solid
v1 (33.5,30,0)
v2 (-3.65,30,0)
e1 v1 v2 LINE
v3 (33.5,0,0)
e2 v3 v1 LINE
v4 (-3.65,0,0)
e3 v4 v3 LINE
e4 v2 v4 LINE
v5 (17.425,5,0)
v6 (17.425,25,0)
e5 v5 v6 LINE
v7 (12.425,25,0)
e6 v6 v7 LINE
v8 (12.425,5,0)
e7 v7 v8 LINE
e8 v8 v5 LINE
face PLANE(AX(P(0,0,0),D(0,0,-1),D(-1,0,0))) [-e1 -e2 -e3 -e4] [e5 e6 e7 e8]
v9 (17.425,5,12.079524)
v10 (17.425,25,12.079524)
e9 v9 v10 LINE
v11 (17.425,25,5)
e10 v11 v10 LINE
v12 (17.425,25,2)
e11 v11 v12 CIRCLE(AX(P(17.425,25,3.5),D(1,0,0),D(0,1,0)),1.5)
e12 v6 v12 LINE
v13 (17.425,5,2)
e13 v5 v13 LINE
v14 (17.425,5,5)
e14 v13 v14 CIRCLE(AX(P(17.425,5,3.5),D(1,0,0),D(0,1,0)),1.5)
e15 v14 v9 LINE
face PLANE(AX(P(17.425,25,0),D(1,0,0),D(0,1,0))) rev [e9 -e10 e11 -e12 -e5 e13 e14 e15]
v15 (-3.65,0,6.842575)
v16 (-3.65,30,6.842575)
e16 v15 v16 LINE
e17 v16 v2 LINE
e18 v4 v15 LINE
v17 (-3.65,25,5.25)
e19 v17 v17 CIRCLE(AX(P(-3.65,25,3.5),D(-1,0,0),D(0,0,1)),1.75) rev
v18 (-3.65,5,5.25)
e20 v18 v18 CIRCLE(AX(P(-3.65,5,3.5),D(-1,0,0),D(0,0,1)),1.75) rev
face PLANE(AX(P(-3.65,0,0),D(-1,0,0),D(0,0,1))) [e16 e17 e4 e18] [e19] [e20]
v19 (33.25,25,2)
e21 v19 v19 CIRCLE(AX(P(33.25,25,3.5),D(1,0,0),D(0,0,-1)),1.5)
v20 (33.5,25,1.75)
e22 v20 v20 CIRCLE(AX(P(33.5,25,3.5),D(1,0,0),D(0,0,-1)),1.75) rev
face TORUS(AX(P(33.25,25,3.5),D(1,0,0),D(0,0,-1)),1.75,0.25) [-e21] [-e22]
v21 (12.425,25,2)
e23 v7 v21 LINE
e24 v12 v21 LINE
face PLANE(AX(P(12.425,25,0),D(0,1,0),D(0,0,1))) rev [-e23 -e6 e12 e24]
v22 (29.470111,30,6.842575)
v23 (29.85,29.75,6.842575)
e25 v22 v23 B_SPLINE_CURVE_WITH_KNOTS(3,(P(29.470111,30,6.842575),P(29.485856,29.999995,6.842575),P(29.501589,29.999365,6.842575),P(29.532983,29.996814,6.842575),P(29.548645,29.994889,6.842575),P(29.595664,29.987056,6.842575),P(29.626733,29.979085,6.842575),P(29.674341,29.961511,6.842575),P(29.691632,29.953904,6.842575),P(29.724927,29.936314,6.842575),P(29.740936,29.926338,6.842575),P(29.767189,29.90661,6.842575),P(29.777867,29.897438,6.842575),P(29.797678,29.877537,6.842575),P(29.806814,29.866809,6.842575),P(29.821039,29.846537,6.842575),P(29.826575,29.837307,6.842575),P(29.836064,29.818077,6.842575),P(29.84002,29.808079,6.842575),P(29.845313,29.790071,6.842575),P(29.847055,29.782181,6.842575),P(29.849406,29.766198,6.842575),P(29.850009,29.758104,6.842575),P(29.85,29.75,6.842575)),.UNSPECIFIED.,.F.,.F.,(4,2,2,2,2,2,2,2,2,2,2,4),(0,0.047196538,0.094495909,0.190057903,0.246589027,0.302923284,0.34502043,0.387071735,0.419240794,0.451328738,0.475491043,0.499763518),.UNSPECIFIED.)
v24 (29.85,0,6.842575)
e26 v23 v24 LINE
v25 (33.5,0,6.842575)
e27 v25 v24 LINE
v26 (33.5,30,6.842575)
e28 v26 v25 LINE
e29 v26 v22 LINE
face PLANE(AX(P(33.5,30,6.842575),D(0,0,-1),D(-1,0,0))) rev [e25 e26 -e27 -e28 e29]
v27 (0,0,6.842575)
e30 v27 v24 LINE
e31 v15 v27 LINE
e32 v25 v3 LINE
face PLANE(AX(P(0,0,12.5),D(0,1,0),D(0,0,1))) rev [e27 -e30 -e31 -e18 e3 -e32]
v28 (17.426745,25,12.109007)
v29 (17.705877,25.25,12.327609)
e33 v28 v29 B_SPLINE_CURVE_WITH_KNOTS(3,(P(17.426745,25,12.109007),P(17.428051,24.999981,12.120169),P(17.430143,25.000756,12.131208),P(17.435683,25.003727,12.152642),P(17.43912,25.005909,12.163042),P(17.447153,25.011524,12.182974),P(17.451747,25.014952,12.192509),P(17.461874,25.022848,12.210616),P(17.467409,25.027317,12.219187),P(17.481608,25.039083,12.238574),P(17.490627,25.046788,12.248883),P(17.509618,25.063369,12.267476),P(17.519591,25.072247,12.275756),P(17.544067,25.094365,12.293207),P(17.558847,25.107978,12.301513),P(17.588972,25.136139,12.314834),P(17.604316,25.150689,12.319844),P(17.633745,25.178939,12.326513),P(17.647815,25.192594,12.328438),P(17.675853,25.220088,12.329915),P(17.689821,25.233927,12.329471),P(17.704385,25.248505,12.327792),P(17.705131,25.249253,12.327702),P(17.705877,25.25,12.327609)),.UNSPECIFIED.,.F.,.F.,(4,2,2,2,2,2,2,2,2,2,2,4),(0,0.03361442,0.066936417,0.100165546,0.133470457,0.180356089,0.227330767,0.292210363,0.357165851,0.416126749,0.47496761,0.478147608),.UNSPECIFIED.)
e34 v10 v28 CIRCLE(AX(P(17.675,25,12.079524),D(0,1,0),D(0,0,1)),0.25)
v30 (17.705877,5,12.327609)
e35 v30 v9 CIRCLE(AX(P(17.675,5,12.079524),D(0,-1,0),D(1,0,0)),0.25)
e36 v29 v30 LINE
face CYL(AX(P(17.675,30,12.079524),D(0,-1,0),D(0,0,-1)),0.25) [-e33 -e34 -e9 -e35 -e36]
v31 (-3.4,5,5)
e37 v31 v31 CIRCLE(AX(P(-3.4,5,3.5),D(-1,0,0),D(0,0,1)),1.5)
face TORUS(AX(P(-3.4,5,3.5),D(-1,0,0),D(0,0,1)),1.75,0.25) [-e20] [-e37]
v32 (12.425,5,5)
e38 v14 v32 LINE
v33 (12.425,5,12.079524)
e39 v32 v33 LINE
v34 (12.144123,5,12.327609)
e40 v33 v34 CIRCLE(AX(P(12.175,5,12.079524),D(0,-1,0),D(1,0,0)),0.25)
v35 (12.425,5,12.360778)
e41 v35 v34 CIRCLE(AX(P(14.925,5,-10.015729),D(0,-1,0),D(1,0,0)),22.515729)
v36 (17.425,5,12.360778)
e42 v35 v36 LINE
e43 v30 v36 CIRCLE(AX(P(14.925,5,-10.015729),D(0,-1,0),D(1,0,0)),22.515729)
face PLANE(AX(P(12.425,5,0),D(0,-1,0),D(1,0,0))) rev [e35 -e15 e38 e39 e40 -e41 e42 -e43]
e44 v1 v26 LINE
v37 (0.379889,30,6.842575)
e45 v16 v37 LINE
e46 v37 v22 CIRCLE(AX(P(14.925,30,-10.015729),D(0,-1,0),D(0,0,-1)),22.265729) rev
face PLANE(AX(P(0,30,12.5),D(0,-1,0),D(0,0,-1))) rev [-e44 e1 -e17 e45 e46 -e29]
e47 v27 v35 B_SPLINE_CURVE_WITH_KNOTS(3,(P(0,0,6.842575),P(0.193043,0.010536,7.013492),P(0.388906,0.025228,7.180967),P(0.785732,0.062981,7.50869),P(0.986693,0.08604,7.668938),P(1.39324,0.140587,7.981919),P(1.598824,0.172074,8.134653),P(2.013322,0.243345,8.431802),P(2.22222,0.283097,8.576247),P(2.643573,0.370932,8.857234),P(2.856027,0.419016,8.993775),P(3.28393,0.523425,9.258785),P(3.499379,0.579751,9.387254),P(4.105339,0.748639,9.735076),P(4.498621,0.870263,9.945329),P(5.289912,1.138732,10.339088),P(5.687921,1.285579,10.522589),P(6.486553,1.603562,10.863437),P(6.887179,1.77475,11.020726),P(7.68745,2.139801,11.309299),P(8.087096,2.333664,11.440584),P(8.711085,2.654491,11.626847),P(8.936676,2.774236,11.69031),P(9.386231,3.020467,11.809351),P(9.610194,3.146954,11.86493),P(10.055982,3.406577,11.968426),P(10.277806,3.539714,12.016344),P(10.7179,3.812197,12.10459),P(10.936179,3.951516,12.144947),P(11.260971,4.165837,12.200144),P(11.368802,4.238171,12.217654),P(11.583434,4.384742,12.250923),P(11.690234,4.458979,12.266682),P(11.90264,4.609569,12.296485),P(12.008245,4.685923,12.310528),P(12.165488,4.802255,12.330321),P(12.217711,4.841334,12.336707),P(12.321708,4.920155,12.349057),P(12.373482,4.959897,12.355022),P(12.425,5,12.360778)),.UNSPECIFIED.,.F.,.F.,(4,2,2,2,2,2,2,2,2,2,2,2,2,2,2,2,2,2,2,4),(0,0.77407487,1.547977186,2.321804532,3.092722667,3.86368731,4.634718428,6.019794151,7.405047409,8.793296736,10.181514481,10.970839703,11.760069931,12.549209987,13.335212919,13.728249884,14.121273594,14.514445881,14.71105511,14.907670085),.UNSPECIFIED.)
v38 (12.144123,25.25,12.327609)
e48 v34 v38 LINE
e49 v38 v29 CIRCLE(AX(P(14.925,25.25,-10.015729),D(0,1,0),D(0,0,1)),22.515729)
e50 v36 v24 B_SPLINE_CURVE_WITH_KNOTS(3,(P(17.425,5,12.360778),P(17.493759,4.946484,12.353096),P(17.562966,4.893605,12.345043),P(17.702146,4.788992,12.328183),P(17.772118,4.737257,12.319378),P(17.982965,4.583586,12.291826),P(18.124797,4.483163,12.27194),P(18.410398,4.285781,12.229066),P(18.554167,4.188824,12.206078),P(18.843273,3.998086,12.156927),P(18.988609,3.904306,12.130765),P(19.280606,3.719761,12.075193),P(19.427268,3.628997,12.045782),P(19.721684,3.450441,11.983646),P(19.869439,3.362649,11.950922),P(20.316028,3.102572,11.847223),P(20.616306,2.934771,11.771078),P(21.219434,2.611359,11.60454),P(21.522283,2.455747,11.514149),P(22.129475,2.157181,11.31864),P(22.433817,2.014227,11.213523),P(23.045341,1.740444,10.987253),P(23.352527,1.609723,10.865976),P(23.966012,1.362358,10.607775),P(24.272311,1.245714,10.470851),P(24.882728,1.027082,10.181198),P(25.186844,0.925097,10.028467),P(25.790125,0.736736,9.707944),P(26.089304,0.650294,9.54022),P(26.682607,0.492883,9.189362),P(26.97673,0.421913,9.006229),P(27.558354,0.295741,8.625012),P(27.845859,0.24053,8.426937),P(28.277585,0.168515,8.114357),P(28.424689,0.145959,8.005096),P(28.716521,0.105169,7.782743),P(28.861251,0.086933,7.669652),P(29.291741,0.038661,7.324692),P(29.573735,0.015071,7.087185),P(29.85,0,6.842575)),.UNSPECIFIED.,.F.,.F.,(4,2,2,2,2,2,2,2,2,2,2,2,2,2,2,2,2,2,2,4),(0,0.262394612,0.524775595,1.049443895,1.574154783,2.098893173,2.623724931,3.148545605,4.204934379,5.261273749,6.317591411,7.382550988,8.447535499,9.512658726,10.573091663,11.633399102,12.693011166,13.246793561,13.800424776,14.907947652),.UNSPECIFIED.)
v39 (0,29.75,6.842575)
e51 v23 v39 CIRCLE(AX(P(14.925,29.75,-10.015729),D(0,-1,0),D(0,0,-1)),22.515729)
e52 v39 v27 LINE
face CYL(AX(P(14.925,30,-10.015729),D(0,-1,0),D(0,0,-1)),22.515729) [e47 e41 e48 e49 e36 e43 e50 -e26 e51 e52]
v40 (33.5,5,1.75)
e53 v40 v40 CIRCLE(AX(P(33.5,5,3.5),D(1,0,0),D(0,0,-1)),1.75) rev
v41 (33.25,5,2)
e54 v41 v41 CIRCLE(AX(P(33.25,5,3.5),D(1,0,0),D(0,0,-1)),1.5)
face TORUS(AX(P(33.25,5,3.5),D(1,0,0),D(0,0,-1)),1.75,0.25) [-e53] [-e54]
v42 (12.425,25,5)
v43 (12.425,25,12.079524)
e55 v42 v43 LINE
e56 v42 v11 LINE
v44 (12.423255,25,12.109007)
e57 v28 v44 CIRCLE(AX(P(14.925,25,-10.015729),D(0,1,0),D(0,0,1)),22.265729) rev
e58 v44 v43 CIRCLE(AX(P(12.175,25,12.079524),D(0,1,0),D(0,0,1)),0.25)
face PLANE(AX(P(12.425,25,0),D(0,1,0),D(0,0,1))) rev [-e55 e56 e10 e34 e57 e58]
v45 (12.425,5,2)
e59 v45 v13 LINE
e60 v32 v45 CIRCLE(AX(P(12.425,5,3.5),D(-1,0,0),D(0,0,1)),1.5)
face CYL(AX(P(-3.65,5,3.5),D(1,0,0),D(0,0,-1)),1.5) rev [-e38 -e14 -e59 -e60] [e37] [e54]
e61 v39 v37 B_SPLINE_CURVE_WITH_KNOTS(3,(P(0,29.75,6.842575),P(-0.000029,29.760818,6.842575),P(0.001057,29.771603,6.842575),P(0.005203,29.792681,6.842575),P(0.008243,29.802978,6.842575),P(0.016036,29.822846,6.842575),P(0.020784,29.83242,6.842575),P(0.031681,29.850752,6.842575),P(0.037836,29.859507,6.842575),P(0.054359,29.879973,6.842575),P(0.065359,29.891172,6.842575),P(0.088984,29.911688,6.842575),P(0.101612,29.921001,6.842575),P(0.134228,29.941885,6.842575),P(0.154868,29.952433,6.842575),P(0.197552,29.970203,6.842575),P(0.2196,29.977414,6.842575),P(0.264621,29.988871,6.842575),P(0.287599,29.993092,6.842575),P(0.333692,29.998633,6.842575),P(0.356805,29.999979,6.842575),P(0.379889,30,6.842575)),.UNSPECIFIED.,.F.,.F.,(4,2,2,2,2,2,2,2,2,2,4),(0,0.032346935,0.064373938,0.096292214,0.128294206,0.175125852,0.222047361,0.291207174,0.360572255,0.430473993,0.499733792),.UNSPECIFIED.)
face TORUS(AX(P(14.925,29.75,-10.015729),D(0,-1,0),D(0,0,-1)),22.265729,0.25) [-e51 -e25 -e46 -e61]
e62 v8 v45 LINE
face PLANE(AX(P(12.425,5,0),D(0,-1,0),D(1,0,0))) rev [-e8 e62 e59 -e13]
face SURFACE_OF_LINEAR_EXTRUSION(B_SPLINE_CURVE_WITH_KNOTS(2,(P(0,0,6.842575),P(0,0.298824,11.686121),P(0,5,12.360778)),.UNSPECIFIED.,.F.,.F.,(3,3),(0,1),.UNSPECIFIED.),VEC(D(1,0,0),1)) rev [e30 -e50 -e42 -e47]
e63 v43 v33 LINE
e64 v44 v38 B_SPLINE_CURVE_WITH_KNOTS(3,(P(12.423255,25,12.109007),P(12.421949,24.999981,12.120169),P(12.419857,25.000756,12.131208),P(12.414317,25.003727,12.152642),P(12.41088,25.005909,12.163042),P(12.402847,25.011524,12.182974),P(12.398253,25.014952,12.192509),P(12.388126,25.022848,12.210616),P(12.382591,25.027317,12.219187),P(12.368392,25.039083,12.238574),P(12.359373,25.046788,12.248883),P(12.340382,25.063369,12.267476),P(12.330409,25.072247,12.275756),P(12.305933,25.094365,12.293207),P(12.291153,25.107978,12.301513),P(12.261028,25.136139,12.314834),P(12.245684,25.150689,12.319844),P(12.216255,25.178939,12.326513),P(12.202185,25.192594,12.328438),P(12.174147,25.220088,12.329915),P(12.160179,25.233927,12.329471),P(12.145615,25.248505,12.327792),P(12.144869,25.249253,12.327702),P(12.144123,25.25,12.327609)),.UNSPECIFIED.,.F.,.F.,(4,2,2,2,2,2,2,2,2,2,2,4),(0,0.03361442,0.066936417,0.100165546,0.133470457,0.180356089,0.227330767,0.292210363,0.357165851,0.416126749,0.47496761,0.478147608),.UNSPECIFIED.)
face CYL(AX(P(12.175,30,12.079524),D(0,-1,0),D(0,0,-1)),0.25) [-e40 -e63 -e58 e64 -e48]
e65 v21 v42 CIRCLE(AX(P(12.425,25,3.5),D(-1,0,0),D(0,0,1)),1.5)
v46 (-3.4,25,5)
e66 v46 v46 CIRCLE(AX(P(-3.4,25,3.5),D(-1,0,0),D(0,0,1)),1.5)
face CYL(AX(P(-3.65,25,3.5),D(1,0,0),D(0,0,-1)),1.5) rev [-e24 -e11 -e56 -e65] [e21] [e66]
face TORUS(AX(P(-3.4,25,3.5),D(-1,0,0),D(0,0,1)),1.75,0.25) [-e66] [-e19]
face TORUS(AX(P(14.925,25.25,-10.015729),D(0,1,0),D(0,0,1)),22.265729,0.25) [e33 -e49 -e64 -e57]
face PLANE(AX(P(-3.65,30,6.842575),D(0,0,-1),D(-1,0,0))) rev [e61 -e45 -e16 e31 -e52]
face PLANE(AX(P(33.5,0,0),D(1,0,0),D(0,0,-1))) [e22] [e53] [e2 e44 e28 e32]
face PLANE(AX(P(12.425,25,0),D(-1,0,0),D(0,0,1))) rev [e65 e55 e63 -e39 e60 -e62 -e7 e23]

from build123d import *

# Parameters (mm, degrees)
SKETCH1_W               = 29.85
SKETCH1_H               = 30
BOSS_EXTRUDE1_DEPTH     = 12.5
SKETCH2_W               = 5
SKETCH2_H               = 20
CUT_EXTRUDE1_DEPTH      = 45.127910669
CUT_EXTRUDE3_DEPTH      = 45.127910669
CUT_EXTRUDE5_DEPTH      = 45.127910669
SKETCH8_W               = 6.842575397
SKETCH8_H               = 30
BOSS_EXTRUDE5_DEPTH     = 3.65
SKETCH9_W               = 6.842575397
SKETCH9_H               = 30
BOSS_EXTRUDE6_DEPTH     = 3.65
CUT_EXTRUDE7_DEPTH      = 47.674404212
CUT_EXTRUDE7_DEPTH_BACK = 47.674404212
SKETCH4_R               = 1.5
FILLET17_R              = 0.25
FILLET19_R              = 0.25


with BuildPart() as part:
    # Sketch1 → Boss-Extrude1 (new body)
    with BuildSketch(Plane.XY):
        with Locations((14.925, 15)):
            Rectangle(SKETCH1_W, SKETCH1_H)
    extrude(amount=BOSS_EXTRUDE1_DEPTH)

    # Sketch2 → Cut-Extrude1 (cut, through all)
    with BuildSketch(Plane.XY.offset(12.5)):
        with Locations((14.925, 15)):
            Rectangle(SKETCH2_W, SKETCH2_H)
    extrude(amount=-CUT_EXTRUDE1_DEPTH, mode=Mode.SUBTRACT)

    # Sketch5 → Cut-Extrude3 (cut, through all)
    with BuildSketch(Plane.XZ):
        with BuildLine():
            Line((0, 6.842575397), (-5.709638119, 18.35105476))
            Line((-5.709638119, 18.35105476), (14.925, 23.822049063))
            Line((14.925, 23.822049063), (34.386752026, 18.35105476))
            Line((34.386752026, 18.35105476), (29.85, 6.842575397))
            ThreePointArc((29.85, 6.842575397), (14.925, 12.5), (0, 6.842575397))
        make_face()
    extrude(amount=-CUT_EXTRUDE3_DEPTH, mode=Mode.SUBTRACT)

    # Sketch7 → Cut-Extrude5 (cut, through all)
    with BuildSketch(Plane(origin=(29.85, 0, 0), x_dir=(0, 0, -1), z_dir=(1, 0, 0))):
        with BuildLine():
            Line((-6.842575397, 0), (-6.842575397, -1.983675783))
            Line((-6.842575397, -1.983675783), (-14.601311023, -1.983675783))
            Line((-14.601311023, -1.983675783), (-14.601311023, 5))
            Line((-14.601311023, 5), (-12.360777707, 5))
            add(Edge.make_bspline(
                [(-6.842575397, 0), (-11.686120983, 0.298823628), (-12.360777707, 5)],
                knots=[0, 0, 0, 1, 1, 1], degree=2))
        make_face()
    extrude(amount=-CUT_EXTRUDE5_DEPTH, mode=Mode.SUBTRACT)

    # Sketch8 → Boss-Extrude5 (add)
    with BuildSketch(Plane(origin=(29.85, 0, 0), x_dir=(0, 0, -1), z_dir=(1, 0, 0))):
        with Locations((-3.421287699, 15)):
            Rectangle(SKETCH8_W, SKETCH8_H)
    extrude(amount=BOSS_EXTRUDE5_DEPTH)

    # Sketch9 → Boss-Extrude6 (add)
    with BuildSketch(Plane.ZY):
        with Locations((3.421287699, 15)):
            Rectangle(SKETCH9_W, SKETCH9_H)
    extrude(amount=BOSS_EXTRUDE6_DEPTH)

    # Sketch4 → Cut-Extrude7 (cut, two sides: drawn at the far end of the back side and taken through both)
    with BuildSketch(Plane(origin=(29.85, 0, 0), x_dir=(0, 0, -1), z_dir=(1, 0, 0)).offset(-CUT_EXTRUDE7_DEPTH_BACK)):
        with Locations((-3.5, 25)):
            Circle(SKETCH4_R)
        with Locations((-3.5, 5)):
            Circle(SKETCH4_R)
    extrude(amount=CUT_EXTRUDE7_DEPTH + CUT_EXTRUDE7_DEPTH_BACK, mode=Mode.SUBTRACT)

    # Fillet17
    fillet17_edges = [part.edges().sort_by_distance(p)[0] for p in [
        (-3.65, 25, 5),
        (33.5, 25, 5),
        (-3.65, 5, 5),
        (33.5, 5, 5),
    ]]
    fillet(fillet17_edges, radius=FILLET17_R)

    # Fillet19
    # the kernel refuses this fillet: 0.25 mm, written as the material it takes off along each edge
    with BuildSketch(Plane(origin=(17.425, 25, 12.360777707), x_dir=(0.9930996963041147, 0, -0.11727315635163624), z_dir=(0, -1, 0))) as fillet19_piece_1:
        with BuildLine():
            CenterArc((0.28125848, -0.249995069), FILLET19_R, 89.640140573, 97.094614091)
            Line((0.032983556, -0.279313358), (0, 0))
            ThreePointArc((0, 0), (0.141414326, 0.000444094), (0.282828652, 0))
        make_face()
    extrude(amount=20, mode=Mode.SUBTRACT)
    with BuildSketch(Plane(origin=(14.925, 25, -10.015728977), x_dir=(-0.13857412950442824, 0, 0.9903520639813349), z_dir=(-0.9903520639813349, 0, -0.13857412950442824))) as fillet19_piece_2_section:
        with BuildLine():
            CenterArc((22.515728977 - FILLET19_R, FILLET19_R), FILLET19_R, 270, 90)
            Line((22.515728977 - FILLET19_R, 0), (22.515728977, 0))
            Line((22.515728977, 0), (22.515728977, FILLET19_R))
        make_face()
    fillet19_piece_2 = revolve(axis=Axis((14.925, 25, -10.015728977), (0, 1, 0)), revolution_arc=15.930691333, mode=Mode.PRIVATE)
    fillet19_piece_2 = split(fillet19_piece_2, bisect_by=Plane(origin=(12.425, 25.070178335, 12.429821665), z_dir=(1, 0, 0)), keep=Keep.TOP, mode=Mode.PRIVATE)
    fillet19_piece_2 = split(fillet19_piece_2, bisect_by=Plane(origin=(17.425, 25.070178335, 12.429821665), z_dir=(-1, 0, 0)), keep=Keep.TOP, mode=Mode.PRIVATE)
    add(fillet19_piece_2, mode=Mode.SUBTRACT)
    with BuildSketch(Plane(origin=(14.925, 30, -10.015728977), x_dir=(0.6834024940823613, 0, 0.7300418009141724), z_dir=(0.7300418009141724, 0, -0.6834024940823613))) as fillet19_piece_3_section:
        with BuildLine():
            CenterArc((22.515728977 - FILLET19_R, FILLET19_R), FILLET19_R, 270, 90)
            Line((22.515728977, FILLET19_R), (22.515728977, 0))
            Line((22.515728977, 0), (22.515728977 - FILLET19_R, 0))
        make_face()
    fillet19_piece_3 = revolve(axis=Axis((14.925, 30, -10.015728977), (0, -1, 0)), revolution_arc=86.220203027, mode=Mode.PRIVATE)
    fillet19_piece_3 = split(fillet19_piece_3, bisect_by=Plane(origin=(14.925, 29.93245071, 6.842575397), z_dir=(0, 0, 1)), keep=Keep.TOP, mode=Mode.PRIVATE)
    add(fillet19_piece_3, mode=Mode.SUBTRACT)
    with BuildSketch(Plane(origin=(12.425, 25, 12.360777707), x_dir=(-0.9930996963041147, 0, -0.1172731563516355), z_dir=(0, -1, 0))) as fillet19_piece_4:
        with BuildLine():
            CenterArc((0.28125848, 0.249995069), FILLET19_R, 173.265245336, 97.094614091)
            Line((0.032983556, 0.279313358), (0, 0))
            ThreePointArc((0, 0), (0.141414326, -0.000444094), (0.282828652, 0))
        make_face()
    extrude(amount=20, mode=Mode.SUBTRACT)
    with BuildSketch(Plane(origin=(17.425, 25.707071631, 12.360777707), x_dir=(0.9930996963041131, 0, -0.11727315635164862), z_dir=(0, -1, 0))) as fillet19_piece_5a_section:
        with BuildLine():
            CenterArc((0.28125848, -0.249995069), FILLET19_R, 89.640140573, 97.094614091)
            Line((0.032983556, -0.279313358), (0, 0))
            ThreePointArc((0, 0), (0.141414326, 0.000444094), (0.282828652, 0))
        make_face()
    fillet19_piece_5a = extrude(amount=20.707071631, mode=Mode.PRIVATE)
    fillet19_piece_5a = split(fillet19_piece_5a, bisect_by=Plane(origin=(17.489598012, 25, 12.288810309), z_dir=(0, 1, 0)), keep=Keep.TOP, mode=Mode.PRIVATE)
    with BuildSketch(Plane(origin=(14.925, 25, -10.015728977), x_dir=(-0.13857412950442824, 0, 0.9903520639813349), z_dir=(-0.9903520639813349, 0, -0.13857412950442824))) as fillet19_piece_5b_section:
        with BuildLine():
            CenterArc((22.515728977 - FILLET19_R, FILLET19_R), FILLET19_R, 270, 90)
            Line((22.515728977 - FILLET19_R, 0), (22.515728977, 0))
            Line((22.515728977, 0), (22.515728977, FILLET19_R))
        make_face()
    fillet19_piece_5b = revolve(axis=Axis((14.925, 25, -10.015728977), (0, 1, 0)), revolution_arc=15.930691333, mode=Mode.PRIVATE)
    fillet19_piece_5b = split(fillet19_piece_5b, bisect_by=Plane(origin=(17.425, 25.056986655, 12.26732893), z_dir=(1, 0, 0)), keep=Keep.TOP, mode=Mode.PRIVATE)
    fillet19_piece_5 = fillet19_piece_5a & fillet19_piece_5b
    add(fillet19_piece_5, mode=Mode.SUBTRACT)
    with BuildSketch(Plane(origin=(14.925, 25, -10.015728977), x_dir=(-0.13857412950442824, 0, 0.9903520639813349), z_dir=(-0.9903520639813349, 0, -0.13857412950442824))) as fillet19_piece_6a_section:
        with BuildLine():
            CenterArc((22.515728977 - FILLET19_R, FILLET19_R), FILLET19_R, 270, 90)
            Line((22.515728977 - FILLET19_R, 0), (22.515728977, 0))
            Line((22.515728977, 0), (22.515728977, FILLET19_R))
        make_face()
    fillet19_piece_6a = revolve(axis=Axis((14.925, 25, -10.015728977), (0, 1, 0)), revolution_arc=15.930691333, mode=Mode.PRIVATE)
    fillet19_piece_6a = split(fillet19_piece_6a, bisect_by=Plane(origin=(12.425, 25.056986602, 12.267328652), z_dir=(-1, 0, 0)), keep=Keep.TOP, mode=Mode.PRIVATE)
    with BuildSketch(Plane(origin=(12.425, 25.707071631, 12.360777707), x_dir=(-0.9930996963041131, 0, -0.11727315635164788), z_dir=(0, -1, 0))) as fillet19_piece_6b_section:
        with BuildLine():
            CenterArc((0.28125848, 0.249995069), FILLET19_R, 173.265245336, 97.094614091)
            Line((0.032983556, 0.279313358), (0, 0))
            ThreePointArc((0, 0), (0.141414326, -0.000444094), (0.282828652, 0))
        make_face()
    fillet19_piece_6b = extrude(amount=20.707071631, mode=Mode.PRIVATE)
    fillet19_piece_6b = split(fillet19_piece_6b, bisect_by=Plane(origin=(12.360401988, 25, 12.288810309), z_dir=(0, 1, 0)), keep=Keep.TOP, mode=Mode.PRIVATE)
    fillet19_piece_6 = fillet19_piece_6a & fillet19_piece_6b
    add(fillet19_piece_6, mode=Mode.SUBTRACT)


solid = part.part
